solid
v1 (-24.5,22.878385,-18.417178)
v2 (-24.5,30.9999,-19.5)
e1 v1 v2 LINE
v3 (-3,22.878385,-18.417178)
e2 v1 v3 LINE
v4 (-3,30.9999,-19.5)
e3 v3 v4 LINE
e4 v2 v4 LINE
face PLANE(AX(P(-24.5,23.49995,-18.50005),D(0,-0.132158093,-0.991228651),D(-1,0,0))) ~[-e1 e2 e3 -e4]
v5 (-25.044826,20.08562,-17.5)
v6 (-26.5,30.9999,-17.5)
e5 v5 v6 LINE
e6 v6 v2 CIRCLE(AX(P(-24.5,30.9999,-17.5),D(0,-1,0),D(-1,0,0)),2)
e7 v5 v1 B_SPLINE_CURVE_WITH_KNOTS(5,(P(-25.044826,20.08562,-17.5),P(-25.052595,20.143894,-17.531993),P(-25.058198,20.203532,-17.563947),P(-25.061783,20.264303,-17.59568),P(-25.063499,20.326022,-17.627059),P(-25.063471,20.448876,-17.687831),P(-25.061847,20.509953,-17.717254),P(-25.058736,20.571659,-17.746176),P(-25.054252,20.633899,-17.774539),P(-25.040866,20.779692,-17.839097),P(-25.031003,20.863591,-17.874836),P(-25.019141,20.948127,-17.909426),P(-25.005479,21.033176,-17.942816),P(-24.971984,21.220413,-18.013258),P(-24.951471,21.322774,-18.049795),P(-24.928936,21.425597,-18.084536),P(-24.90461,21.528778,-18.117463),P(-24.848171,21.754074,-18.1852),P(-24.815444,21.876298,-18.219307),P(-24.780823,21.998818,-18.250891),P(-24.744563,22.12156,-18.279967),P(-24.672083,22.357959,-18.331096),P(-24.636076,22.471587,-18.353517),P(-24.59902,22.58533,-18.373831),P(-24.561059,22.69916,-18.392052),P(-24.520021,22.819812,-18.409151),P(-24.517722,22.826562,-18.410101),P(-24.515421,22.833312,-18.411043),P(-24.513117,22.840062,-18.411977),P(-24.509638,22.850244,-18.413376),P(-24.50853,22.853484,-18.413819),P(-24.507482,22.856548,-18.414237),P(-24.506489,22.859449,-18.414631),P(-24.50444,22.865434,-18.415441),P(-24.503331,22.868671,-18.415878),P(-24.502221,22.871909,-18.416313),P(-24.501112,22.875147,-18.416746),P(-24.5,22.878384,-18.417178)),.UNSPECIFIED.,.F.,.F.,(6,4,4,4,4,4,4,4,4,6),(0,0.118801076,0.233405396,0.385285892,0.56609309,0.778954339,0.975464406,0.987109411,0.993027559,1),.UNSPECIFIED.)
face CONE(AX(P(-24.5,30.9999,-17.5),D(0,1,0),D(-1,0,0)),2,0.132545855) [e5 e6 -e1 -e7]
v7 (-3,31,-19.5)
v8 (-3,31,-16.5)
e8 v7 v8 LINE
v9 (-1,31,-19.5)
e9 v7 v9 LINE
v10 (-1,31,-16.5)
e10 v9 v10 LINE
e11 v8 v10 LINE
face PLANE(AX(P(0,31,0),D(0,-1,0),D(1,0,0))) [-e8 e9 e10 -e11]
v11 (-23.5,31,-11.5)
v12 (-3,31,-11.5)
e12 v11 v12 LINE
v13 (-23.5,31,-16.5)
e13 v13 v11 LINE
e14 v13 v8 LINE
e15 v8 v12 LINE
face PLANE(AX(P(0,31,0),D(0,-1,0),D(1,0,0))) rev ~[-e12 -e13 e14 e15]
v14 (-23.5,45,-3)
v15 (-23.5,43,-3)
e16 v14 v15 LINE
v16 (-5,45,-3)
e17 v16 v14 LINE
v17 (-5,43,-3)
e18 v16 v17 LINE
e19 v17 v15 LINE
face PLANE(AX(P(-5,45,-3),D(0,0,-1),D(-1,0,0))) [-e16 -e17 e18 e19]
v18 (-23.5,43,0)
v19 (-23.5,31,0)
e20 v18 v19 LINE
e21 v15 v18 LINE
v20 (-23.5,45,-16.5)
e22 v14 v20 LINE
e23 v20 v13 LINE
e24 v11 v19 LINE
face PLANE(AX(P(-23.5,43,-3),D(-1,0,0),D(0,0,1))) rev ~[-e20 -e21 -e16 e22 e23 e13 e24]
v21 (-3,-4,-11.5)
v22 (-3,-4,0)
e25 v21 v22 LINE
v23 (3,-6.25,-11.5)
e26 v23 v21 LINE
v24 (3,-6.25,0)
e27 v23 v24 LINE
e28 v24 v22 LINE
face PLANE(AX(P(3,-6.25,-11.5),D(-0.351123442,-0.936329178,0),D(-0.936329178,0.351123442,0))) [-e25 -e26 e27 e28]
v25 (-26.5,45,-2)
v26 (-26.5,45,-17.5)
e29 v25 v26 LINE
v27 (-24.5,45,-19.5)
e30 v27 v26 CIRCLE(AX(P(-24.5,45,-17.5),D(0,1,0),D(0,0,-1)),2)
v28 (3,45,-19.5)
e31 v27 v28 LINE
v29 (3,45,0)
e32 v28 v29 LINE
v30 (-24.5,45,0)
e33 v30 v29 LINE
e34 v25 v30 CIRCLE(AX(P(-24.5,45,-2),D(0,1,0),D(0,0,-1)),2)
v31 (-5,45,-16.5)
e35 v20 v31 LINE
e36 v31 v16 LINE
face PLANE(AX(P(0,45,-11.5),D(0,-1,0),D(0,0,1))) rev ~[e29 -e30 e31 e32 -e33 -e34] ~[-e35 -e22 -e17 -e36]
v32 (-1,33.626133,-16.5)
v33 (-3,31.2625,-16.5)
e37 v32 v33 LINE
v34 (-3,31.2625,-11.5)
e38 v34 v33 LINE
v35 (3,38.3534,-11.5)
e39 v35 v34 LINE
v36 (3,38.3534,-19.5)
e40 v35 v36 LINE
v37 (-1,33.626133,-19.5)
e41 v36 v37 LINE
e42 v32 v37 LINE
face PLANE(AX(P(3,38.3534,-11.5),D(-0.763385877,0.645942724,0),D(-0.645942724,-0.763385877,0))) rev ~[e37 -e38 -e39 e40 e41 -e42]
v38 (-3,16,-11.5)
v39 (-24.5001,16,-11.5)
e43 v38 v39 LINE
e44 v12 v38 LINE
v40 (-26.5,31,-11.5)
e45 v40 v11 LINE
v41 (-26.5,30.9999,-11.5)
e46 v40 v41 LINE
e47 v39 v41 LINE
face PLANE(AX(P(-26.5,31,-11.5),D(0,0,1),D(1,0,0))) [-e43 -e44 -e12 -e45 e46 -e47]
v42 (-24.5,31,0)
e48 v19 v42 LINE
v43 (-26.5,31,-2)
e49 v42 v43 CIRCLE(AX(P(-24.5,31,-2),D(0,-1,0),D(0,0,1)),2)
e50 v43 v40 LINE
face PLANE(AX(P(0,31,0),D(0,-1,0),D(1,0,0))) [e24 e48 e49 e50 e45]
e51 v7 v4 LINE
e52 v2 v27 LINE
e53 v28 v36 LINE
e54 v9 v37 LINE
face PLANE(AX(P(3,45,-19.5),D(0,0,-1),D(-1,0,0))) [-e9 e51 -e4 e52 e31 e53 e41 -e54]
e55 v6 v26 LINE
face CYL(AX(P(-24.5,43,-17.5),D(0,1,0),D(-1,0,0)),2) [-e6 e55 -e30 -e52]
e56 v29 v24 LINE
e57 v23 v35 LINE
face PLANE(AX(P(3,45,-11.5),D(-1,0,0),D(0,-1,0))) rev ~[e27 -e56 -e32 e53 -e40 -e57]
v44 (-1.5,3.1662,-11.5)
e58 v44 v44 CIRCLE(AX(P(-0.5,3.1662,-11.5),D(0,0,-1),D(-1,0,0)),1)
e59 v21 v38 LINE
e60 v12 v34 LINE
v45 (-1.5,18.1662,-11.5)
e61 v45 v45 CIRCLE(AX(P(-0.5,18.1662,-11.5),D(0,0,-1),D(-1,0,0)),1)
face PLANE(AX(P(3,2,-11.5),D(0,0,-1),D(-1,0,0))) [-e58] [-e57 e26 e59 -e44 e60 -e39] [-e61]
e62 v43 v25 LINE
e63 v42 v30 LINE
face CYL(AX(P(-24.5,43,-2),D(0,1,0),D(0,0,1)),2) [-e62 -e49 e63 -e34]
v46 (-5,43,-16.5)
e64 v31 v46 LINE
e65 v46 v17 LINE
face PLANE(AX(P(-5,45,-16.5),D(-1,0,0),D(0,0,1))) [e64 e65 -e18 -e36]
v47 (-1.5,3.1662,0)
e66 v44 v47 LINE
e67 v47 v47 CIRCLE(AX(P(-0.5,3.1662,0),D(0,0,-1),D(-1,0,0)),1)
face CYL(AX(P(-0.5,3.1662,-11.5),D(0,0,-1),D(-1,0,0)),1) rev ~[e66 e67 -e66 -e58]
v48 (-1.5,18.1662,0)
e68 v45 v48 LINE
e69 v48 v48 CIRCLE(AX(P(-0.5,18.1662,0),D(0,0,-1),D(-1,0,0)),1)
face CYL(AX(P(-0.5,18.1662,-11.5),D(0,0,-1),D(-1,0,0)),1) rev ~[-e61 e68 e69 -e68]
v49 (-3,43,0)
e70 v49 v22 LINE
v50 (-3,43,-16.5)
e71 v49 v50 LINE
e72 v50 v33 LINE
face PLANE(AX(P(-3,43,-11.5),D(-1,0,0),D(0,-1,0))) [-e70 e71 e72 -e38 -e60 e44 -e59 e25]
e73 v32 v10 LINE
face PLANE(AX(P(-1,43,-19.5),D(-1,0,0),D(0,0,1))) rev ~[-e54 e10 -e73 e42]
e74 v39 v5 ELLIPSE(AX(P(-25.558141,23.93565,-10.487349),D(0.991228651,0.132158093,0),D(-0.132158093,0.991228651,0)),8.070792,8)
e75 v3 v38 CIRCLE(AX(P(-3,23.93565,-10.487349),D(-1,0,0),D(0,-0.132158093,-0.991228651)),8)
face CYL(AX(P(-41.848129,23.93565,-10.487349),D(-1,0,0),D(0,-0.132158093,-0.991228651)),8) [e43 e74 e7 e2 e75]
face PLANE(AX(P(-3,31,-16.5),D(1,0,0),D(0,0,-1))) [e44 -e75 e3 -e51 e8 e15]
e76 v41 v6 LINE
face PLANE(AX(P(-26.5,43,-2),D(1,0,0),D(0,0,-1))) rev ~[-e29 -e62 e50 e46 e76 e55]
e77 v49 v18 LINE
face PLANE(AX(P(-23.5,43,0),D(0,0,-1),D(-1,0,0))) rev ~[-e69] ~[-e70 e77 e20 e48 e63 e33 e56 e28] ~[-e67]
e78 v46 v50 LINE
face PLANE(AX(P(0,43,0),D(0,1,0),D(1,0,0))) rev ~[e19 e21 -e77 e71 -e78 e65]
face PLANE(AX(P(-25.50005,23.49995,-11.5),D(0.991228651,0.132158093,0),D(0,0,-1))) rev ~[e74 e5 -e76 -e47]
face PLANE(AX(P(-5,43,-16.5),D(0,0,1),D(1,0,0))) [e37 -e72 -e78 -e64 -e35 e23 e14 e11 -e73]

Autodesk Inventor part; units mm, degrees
ref_plane "YZ Plane" through (0, 0, 0) normal (1, 0, 0) x (0, 1, 0)
sketch "スケッチ1" plane through (0, 0, 0) normal (1, 0, 0) x (0, 1, 0)
  line L0 (45, 0) -> (0, 0)
  line L1 (0, 0) -> (0, -11.5)
  line L2 (0, -11.5) -> (45, -11.5)
  line L3 (45, -11.5) -> (45, 0)
  dimension "d0" = 45
  dimension "d1" = 11.5
extrude "押し出し1" add sketch "スケッチ1" along normal blind 3
sketch "スケッチ5" plane through (0, 45, 0) normal (0, 1, 0) x (1, 0, 0)
  line L0 (-5, 3) -> (-23.5, 3)
  line L1 (-23.5, 3) -> (-23.5, 16.5)
  line L2 (-23.5, 16.5) -> (-5, 16.5)
  line L3 (-5, 16.5) -> (-5, 3)
  line L4 (0, 0) -> (-26.5, 0)
  line L5 (-26.5, 0) -> (-26.5, 19.5)
  line L6 (-26.5, 19.5) -> (0, 19.5)
  line L7 (0, 19.5) -> (0, 0)
  point P0 (3, 0)
  dimension "d15" = 18.5
  dimension "d16" = 13.5
  dimension "d17" = 3
  dimension "d18" = 5
  dimension "d19" = 3
  dimension "d20" = 3
extrude "押し出し4" add sketch "スケッチ5" against normal blind 2
ref_plane "作業平面1" through (0, 45, -9.5) normal (1, 0, 0) x (0, 0, -1)
sketch "スケッチ7" plane through (0, 45, -9.5) normal (1, 0, 0) x (0, 0, -1)
  line L0 (0, 0) -> (10, 0) projected
  line L1 (10, -2) -> (2, -2) projected
  line L2 (10, 0) -> (10, -2) projected
  line L3 (2, 0) -> (10, 0) projected
  line L4 (2, -2) -> (2, 0) projected
  point P0 (-9.5, -45)
extrude "押し出し6" cut sketch "スケッチ7" against normal blind 1
fillet "フィレット2" radius 2 2 edges at (-26.5, 44, 0) (-26.5, 44, -19.5)
sketch "スケッチ8" plane through (0, 0, 0) normal (-1, 0, 0) x (0, 0, 1)
  line L0 (0, 43) -> (-11.5, 43) projected
  line L1 (-11.5, 0) -> (-11.5, 43) projected
  line L2 (0, 0) -> (-11.5, 0) projected
  line L3 (0, 43) -> (0, 0) projected
  line L4 (-3, 39.3409) -> (0, 39.3409)
  line L5 (0, 39.3409) -> (0, 27.7002)
  line L6 (0, 27.7002) -> (-3, 27.7002)
  line L7 (-3, 27.7002) -> (-3, 39.3409)
extrude "押し出し7" add sketch "スケッチ8" along normal blind 3
ref_plane "作業平面2" through (3, 2, -11.5) normal (0, 0, -1) x (-1, 0, 0)
sketch "スケッチ10" plane through (3, 2, -11.5) normal (0, 0, -1) x (-1, 0, 0)
  line L0 (-2, -9) -> (6, -6) projected
  line L1 (6, -6) -> (6, 22) projected
  line L2 (0, -2) -> (0, 0) projected
  line L3 (0, -2) -> (6, -2) projected
  line L4 (0, -2) -> (0, -8.25)
  point P0 (3, -2)
extrude "押し出し9" add sketch "スケッチ10" against normal up to surface (11.5 mm away)
sketch "スケッチ11" plane through (3, 45, -11.5) normal (0, 0, -1) x (-1, 0, 0)
  circle A0 centre (3.5, -26.8338) radius 1 projected
  circle A1 centre (3.5, -41.8338) radius 1 projected
  point P0 (3, -45)
sketch "スケッチ12" plane through (0, 43, 0) normal (0, -1, 0) x (1, 0, 0)
  line L0 (-1, -11.5) -> (-3, -11.5) projected
  line L1 (-3, -11.5) -> (-3, 0) projected
  line L2 (-3, 0) -> (-24.5, 0) projected
  arc A0 (-24.5, 0) -> (-26.5, -2) centre (-24.5, -2) ccw projected
  line L3 (-26.5, -2) -> (-26.5, -17.5) projected
  arc A1 (-26.5, -17.5) -> (-24.5, -19.5) centre (-24.5, -17.5) ccw projected
  line L4 (-24.5, -19.5) -> (-1, -19.5) projected
  line L5 (-1, -19.5) -> (-1, -11.5) projected
  line L6 (-23.5, -3) -> (-5, -3) projected
  line L7 (-5, -3) -> (-5, -16.5) projected
  line L8 (-5, -16.5) -> (-23.5, -16.5) projected
  line L9 (-23.5, -16.5) -> (-23.5, -3) projected
  line L10 (-5, -16.5) -> (-1, -16.5)
  line L11 (-23.5, -3) -> (-23.5, 0)
  line L12 (-3, -11.5) -> (-5, -16.5)
  point P0 (0, 0)
extrude "押し出し10" add sketch "スケッチ12" along normal blind 12 contours L5 L4 A1 L3 A0 L2 L11 L9 L8 L10
sketch "スケッチ13" plane through (3, 45, -11.5) normal (0, 0, -1) x (-1, 0, 0)
  line L0 (6, -16.8338) -> (-2.2366, -7.0996) projected
  line L1 (6, -2) -> (6, -49) projected
  line L2 (4, -2) -> (6, -2) projected
  line L3 (4, -2) -> (4, 0) projected
  line L4 (4, 0) -> (0, 0) projected
  line L5 (0, 0) -> (0, -51.25) projected
  line L6 (0, -51.25) -> (6, -49) projected
  line L7 (0, -6.6466) -> (6, -13.7375)
  line L8 (6, -49) -> (6, -2) projected
  point P0 (3, -45)
  point P1 (6, -13.7375)
  dimension "d38" = 2
extrude "押し出し11" add sketch "スケッチ13" along normal up to surface (8 mm away) contours L7 L5 L4 L3 L2 L1
sketch "スケッチ14" plane through (0, 31, 0) normal (0, -1, 0) x (1, 0, 0)
  line L0 (-1, -19.5) -> (-1, -16.5) projected
  line L1 (-1, -16.5) -> (-23.5, -16.5) projected
  line L2 (-23.5, -16.5) -> (-23.5, 0) projected
  line L3 (-23.5, 0) -> (-24.5, 0) projected
  arc A0 (-24.5, 0) -> (-26.5, -2) centre (-24.5, -2) ccw projected
  line L4 (-26.5, -2) -> (-26.5, -17.5) projected
  arc A1 (-26.5, -17.5) -> (-24.5, -19.5) centre (-24.5, -17.5) ccw projected
  line L5 (-24.5, -19.5) -> (-1, -19.5) projected
  line L6 (-1, -19.5) -> (-26.5, -19.5)
  line L7 (-26.5, -19.5) -> (-26.5, -11.5)
  line L8 (-26.5, -11.5) -> (-1, -11.5)
  line L9 (-1, -11.5) -> (-1, -19.5)
  line L10 (-3, -11.5) -> (-3, -16.5) projected
  line L11 (-3, -16.5) -> (-3, -19.5)
  point P0 (0, 0)
  dimension "d41" = 8
extrude "押し出し12" add sketch "スケッチ14" along normal blind 15 contours L5 A1 L4 L8 L2 L1 L11 | L1 L2 L8 L10
chamfer "面取り1" distance 2 distance2 15 3 edges at (-13.75, 16, -19.5) (-25.9142, 16, -18.9142) (-26.5, 16, -14.5) measured on face at (-18, 16, -14.1667)
fillet "フィレット3" radius 8 1 edges at (-13.75, 16, -17.5001)
extrude "押し出し13" cut sketch "スケッチ11" against normal through all
equation "\"d19\" = d17"
equation "\"d20\" = d17"
properties part number "switch_setter"
